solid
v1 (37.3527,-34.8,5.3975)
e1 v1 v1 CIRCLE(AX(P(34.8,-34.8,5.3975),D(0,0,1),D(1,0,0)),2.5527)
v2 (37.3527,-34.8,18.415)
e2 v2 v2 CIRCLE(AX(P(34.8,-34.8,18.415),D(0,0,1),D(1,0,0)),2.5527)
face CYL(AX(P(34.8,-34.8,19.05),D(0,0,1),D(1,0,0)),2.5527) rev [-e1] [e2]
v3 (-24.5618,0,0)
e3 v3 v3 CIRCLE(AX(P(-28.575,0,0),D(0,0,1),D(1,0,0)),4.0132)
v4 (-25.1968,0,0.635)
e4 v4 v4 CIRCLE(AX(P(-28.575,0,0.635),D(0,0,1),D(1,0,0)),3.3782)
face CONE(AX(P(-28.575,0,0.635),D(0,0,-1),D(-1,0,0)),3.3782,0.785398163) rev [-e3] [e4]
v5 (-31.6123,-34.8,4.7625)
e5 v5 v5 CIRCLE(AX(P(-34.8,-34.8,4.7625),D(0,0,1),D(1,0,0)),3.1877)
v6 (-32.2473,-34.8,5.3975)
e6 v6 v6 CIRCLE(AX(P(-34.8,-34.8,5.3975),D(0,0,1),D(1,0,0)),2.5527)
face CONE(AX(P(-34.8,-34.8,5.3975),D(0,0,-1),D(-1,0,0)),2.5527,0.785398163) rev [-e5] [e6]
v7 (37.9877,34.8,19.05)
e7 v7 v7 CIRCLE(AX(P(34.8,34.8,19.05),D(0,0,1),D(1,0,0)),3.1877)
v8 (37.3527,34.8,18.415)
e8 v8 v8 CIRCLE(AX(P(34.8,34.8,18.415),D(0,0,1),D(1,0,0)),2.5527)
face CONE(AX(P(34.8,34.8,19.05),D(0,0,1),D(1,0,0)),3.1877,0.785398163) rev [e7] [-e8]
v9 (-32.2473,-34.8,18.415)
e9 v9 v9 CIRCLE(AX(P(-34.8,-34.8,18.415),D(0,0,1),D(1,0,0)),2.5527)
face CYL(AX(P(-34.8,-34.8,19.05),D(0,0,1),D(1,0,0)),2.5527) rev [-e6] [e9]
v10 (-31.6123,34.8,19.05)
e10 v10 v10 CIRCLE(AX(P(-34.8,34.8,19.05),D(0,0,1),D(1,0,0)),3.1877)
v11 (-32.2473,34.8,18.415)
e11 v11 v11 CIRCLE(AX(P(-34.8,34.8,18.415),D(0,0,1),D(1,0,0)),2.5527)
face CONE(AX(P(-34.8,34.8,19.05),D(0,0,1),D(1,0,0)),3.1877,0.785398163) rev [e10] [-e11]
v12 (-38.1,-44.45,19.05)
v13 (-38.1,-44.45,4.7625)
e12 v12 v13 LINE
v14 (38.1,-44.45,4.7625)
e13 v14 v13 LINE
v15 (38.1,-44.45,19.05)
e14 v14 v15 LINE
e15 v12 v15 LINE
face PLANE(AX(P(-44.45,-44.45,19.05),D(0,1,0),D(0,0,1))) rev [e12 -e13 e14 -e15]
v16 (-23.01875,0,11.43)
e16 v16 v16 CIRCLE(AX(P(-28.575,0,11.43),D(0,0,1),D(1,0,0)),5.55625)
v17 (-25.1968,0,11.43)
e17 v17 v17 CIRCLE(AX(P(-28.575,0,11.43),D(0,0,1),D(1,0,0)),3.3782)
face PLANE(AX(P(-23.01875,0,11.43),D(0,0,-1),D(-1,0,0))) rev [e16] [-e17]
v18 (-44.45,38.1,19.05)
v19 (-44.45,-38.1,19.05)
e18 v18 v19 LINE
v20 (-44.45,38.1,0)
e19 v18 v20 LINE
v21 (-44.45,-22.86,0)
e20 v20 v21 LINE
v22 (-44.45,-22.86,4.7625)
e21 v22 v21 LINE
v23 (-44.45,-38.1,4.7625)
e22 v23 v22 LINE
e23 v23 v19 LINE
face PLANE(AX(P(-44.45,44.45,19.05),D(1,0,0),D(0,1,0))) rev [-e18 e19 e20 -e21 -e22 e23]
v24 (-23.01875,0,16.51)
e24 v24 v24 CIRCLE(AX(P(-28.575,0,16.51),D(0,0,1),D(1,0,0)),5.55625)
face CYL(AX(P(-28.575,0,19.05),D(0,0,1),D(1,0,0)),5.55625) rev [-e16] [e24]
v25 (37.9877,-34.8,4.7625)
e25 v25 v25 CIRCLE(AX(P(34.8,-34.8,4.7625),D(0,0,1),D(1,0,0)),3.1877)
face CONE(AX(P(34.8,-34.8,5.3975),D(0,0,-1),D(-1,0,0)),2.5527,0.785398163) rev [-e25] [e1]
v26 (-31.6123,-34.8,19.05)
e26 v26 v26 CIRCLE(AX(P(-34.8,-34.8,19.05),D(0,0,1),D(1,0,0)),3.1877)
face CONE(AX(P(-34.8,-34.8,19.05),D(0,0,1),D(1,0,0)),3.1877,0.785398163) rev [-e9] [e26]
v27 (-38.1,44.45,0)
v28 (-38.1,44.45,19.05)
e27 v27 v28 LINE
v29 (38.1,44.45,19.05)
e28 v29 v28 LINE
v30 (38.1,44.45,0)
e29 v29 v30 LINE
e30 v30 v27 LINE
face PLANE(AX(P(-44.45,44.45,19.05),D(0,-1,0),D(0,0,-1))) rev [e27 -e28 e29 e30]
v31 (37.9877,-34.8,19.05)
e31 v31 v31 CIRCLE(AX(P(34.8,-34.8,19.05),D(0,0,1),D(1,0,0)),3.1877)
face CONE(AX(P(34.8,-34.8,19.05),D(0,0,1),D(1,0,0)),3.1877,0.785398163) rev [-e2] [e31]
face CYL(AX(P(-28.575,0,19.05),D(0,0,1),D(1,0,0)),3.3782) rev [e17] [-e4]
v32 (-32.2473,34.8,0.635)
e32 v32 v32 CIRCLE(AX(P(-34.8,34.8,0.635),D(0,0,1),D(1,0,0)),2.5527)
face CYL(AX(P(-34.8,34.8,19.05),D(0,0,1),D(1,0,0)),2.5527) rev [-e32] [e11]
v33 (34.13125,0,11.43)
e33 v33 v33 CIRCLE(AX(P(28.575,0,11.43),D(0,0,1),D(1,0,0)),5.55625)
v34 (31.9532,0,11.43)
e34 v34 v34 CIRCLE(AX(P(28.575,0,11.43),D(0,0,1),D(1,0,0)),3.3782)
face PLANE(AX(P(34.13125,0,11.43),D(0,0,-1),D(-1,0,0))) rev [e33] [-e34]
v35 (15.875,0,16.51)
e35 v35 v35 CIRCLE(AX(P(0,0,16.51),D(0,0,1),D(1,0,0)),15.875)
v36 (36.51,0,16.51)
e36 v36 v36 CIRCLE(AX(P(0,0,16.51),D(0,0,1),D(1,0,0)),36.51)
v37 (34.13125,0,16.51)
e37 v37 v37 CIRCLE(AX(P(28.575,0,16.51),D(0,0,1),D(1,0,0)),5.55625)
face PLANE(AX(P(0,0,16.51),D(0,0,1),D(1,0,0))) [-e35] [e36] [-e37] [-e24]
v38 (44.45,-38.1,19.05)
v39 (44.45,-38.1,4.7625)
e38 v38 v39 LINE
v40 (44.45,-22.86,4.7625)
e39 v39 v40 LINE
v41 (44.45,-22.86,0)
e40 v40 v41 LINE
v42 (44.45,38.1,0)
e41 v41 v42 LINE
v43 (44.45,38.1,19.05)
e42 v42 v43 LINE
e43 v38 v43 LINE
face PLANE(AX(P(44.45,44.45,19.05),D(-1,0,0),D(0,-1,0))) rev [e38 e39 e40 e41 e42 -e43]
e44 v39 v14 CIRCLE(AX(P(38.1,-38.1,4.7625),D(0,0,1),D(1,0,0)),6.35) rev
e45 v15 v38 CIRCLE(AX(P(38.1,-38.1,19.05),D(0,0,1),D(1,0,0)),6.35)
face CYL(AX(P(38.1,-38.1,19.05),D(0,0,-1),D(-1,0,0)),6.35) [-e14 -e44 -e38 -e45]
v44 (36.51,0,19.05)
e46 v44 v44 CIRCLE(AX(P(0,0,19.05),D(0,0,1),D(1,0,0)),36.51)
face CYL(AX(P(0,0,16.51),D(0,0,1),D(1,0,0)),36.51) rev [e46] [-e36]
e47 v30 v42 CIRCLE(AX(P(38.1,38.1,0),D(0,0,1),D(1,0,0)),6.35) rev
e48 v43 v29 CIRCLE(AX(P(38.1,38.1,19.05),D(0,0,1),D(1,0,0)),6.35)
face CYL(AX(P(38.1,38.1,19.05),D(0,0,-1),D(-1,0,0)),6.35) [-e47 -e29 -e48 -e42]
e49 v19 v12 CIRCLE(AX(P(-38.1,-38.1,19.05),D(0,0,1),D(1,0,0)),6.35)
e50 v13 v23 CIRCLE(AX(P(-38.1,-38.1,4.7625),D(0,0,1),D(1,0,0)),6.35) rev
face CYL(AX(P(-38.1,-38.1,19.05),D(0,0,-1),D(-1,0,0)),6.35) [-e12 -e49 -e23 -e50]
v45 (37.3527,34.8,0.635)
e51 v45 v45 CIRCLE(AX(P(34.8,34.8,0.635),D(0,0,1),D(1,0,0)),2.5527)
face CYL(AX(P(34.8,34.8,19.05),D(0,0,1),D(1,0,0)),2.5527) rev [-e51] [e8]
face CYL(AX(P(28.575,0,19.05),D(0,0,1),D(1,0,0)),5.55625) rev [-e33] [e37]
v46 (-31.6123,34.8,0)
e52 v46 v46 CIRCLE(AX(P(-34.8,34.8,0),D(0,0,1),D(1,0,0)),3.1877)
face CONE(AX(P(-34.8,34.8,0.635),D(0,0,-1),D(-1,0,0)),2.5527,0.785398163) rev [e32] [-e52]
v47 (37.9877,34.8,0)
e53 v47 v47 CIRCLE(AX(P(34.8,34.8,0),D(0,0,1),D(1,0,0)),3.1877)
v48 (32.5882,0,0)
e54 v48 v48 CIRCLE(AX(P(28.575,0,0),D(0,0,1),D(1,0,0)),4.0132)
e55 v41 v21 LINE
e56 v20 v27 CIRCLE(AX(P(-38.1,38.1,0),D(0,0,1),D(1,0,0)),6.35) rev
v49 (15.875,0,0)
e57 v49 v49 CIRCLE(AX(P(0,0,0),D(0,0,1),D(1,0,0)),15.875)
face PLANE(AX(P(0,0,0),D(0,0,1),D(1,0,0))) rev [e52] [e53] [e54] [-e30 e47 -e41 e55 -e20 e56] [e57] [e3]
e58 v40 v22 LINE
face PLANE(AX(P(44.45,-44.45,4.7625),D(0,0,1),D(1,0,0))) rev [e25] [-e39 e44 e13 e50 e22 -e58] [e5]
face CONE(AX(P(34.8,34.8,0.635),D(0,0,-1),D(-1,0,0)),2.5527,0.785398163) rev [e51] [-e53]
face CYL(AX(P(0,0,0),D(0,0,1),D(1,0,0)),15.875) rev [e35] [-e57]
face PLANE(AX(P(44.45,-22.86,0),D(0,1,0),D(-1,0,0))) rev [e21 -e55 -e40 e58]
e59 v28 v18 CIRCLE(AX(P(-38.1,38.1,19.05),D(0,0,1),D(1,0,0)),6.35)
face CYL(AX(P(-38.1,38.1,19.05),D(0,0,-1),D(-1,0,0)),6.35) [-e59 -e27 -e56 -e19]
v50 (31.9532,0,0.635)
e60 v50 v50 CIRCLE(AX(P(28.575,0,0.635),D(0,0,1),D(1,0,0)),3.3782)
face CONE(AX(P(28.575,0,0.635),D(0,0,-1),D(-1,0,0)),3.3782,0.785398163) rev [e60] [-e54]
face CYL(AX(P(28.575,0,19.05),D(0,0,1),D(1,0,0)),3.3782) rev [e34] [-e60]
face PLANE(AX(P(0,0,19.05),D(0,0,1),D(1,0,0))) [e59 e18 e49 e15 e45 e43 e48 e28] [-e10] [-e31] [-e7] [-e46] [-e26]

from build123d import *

# Parameters (mm, degrees)
SKETCH1_W                                     = 88.9
SKETCH1_H                                     = 88.9
BOSS_EXTRUDE1_DEPTH                           = 19.05
SKETCH2_R                                     = 36.51
CUT_EXTRUDE1_DEPTH                            = 2.54
SKETCH5_R                                     = 15.875
CUT_EXTRUDE3_DEPTH                            = 65.993731236
SKETCH4_W                                     = 4.7625
SKETCH4_H                                     = 21.59
CUT_EXTRUDE2_DEPTH                            = 102.202346811
FILLET1_R                                     = 6.35
CBORE_FOR_1_4_SOCKET_HEAD_CAP_SCREW1_AT_COUNT = 2
CBORE_FOR_1_4_SOCKET_HEAD_CAP_SCREW1_AT_PITCH = 57.15


# Read off the part's stored shape, not the designer's step: 1/4-20 Tapped Hole2
with BuildPart() as part:
    # Sketch1 → Boss-Extrude1 (new body)
    with BuildSketch(Plane.XY):
        Rectangle(SKETCH1_W, SKETCH1_H)
    extrude(amount=BOSS_EXTRUDE1_DEPTH)

    # Sketch2 → Cut-Extrude1 (cut)
    with BuildSketch(Plane.XY.offset(19.05)):
        Circle(SKETCH2_R)
    extrude(amount=-CUT_EXTRUDE1_DEPTH, mode=Mode.SUBTRACT)

    # Sketch5 → Cut-Extrude3 (cut, through all)
    with BuildSketch(Plane.XY.offset(16.51)):
        Circle(SKETCH5_R)
    extrude(amount=-CUT_EXTRUDE3_DEPTH, mode=Mode.SUBTRACT)

    # Sketch4 → Cut-Extrude2 (cut, through all)
    with BuildSketch(Plane.ZY.offset(44.45)):
        with Locations((2.38125, -33.655)):
            Rectangle(SKETCH4_W, SKETCH4_H)
    extrude(amount=-CUT_EXTRUDE2_DEPTH, mode=Mode.SUBTRACT)

    # Fillet1
    fillet1_edges = [part.edges().sort_by_distance(p)[0] for p in [
        (44.45, -44.45, 11.90625),
        (-44.45, -44.45, 11.90625),
        (-44.45, 44.45, 9.525),
        (44.45, 44.45, 9.525),
    ]]
    fillet(fillet1_edges, radius=FILLET1_R)

    # 1/4-20 Tapped Hole2 outline → 1/4-20 Tapped Hole2 (revolve, cut)
    with BuildSketch(Plane(origin=(34.8, 34.8, 0), x_dir=(1, 0, 0), z_dir=(0, -1, 0))):
        Polygon((0, 0), (3.1877, 0), (2.5527, 0.635), (2.5527, 18.415), (3.1877, 19.05), (0, 19.05), align=None)
    revolve(axis=Axis((34.8, 34.8, 0), (0, 0, 1)), mode=Mode.SUBTRACT)

    # 1_4-20 Tapped Hole2 2 outline → 1_4-20 Tapped Hole2 2 (revolve, cut)
    with BuildSketch(Plane(origin=(-34.8, -34.8, 0), x_dir=(1, 0, 0), z_dir=(0, -1, 0))):
        Polygon((0, 4.7625), (3.1877, 4.7625), (2.5527, 5.3975), (2.5527, 18.415), (3.1877, 19.05), (0, 19.05), align=None)
    revolve(axis=Axis((-34.8, -34.8, 0), (0, 0, 1)), mode=Mode.SUBTRACT)

    # 1_4-20 Tapped Hole2 3 outline → 1_4-20 Tapped Hole2 3 (revolve, cut)
    with BuildSketch(Plane(origin=(-34.8, 34.8, 0), x_dir=(1, 0, 0), z_dir=(0, -1, 0))):
        Polygon((0, 0), (3.1877, 0), (2.5527, 0.635), (2.5527, 18.415), (3.1877, 19.05), (0, 19.05), align=None)
    revolve(axis=Axis((-34.8, 34.8, 0), (0, 0, 1)), mode=Mode.SUBTRACT)

    # 1_4-20 Tapped Hole2 4 outline → 1_4-20 Tapped Hole2 4 (revolve, cut)
    with BuildSketch(Plane(origin=(34.8, -34.8, 0), x_dir=(1, 0, 0), z_dir=(0, -1, 0))):
        Polygon((0, 4.7625), (3.1877, 4.7625), (2.5527, 5.3975), (2.5527, 18.415), (3.1877, 19.05), (0, 19.05), align=None)
    revolve(axis=Axis((34.8, -34.8, 0), (0, 0, 1)), mode=Mode.SUBTRACT)

    # Sketch9 → CBORE for 1/4 Socket Head Cap Screw1 (revolve, cut)
    with BuildSketch(Plane(origin=(28.575, 0, 19.05), x_dir=(0, -1, 0), z_dir=(1, 0, 0))):
        Polygon((0, 0), (0, 19.05), (4.0132, 19.05), (3.3782, 18.415), (3.3782, 7.62), (5.55625, 7.62), (5.55625, 0.635), (6.19125, 0), align=None)
    cbore_for_1_4_socket_head_cap_screw1 = revolve(axis=Axis((28.575, 0, 25.4), (0, 0, -1)), mode=Mode.SUBTRACT)

    # CBORE for 1/4 Socket Head Cap Screw1 at: CBORE for 1/4 Socket Head Cap Screw1 ×2
    with Locations(*[(-i * CBORE_FOR_1_4_SOCKET_HEAD_CAP_SCREW1_AT_PITCH, 0, 0) for i in range(1, CBORE_FOR_1_4_SOCKET_HEAD_CAP_SCREW1_AT_COUNT)]):
        add(cbore_for_1_4_socket_head_cap_screw1, mode=Mode.SUBTRACT)


solid = part.part
